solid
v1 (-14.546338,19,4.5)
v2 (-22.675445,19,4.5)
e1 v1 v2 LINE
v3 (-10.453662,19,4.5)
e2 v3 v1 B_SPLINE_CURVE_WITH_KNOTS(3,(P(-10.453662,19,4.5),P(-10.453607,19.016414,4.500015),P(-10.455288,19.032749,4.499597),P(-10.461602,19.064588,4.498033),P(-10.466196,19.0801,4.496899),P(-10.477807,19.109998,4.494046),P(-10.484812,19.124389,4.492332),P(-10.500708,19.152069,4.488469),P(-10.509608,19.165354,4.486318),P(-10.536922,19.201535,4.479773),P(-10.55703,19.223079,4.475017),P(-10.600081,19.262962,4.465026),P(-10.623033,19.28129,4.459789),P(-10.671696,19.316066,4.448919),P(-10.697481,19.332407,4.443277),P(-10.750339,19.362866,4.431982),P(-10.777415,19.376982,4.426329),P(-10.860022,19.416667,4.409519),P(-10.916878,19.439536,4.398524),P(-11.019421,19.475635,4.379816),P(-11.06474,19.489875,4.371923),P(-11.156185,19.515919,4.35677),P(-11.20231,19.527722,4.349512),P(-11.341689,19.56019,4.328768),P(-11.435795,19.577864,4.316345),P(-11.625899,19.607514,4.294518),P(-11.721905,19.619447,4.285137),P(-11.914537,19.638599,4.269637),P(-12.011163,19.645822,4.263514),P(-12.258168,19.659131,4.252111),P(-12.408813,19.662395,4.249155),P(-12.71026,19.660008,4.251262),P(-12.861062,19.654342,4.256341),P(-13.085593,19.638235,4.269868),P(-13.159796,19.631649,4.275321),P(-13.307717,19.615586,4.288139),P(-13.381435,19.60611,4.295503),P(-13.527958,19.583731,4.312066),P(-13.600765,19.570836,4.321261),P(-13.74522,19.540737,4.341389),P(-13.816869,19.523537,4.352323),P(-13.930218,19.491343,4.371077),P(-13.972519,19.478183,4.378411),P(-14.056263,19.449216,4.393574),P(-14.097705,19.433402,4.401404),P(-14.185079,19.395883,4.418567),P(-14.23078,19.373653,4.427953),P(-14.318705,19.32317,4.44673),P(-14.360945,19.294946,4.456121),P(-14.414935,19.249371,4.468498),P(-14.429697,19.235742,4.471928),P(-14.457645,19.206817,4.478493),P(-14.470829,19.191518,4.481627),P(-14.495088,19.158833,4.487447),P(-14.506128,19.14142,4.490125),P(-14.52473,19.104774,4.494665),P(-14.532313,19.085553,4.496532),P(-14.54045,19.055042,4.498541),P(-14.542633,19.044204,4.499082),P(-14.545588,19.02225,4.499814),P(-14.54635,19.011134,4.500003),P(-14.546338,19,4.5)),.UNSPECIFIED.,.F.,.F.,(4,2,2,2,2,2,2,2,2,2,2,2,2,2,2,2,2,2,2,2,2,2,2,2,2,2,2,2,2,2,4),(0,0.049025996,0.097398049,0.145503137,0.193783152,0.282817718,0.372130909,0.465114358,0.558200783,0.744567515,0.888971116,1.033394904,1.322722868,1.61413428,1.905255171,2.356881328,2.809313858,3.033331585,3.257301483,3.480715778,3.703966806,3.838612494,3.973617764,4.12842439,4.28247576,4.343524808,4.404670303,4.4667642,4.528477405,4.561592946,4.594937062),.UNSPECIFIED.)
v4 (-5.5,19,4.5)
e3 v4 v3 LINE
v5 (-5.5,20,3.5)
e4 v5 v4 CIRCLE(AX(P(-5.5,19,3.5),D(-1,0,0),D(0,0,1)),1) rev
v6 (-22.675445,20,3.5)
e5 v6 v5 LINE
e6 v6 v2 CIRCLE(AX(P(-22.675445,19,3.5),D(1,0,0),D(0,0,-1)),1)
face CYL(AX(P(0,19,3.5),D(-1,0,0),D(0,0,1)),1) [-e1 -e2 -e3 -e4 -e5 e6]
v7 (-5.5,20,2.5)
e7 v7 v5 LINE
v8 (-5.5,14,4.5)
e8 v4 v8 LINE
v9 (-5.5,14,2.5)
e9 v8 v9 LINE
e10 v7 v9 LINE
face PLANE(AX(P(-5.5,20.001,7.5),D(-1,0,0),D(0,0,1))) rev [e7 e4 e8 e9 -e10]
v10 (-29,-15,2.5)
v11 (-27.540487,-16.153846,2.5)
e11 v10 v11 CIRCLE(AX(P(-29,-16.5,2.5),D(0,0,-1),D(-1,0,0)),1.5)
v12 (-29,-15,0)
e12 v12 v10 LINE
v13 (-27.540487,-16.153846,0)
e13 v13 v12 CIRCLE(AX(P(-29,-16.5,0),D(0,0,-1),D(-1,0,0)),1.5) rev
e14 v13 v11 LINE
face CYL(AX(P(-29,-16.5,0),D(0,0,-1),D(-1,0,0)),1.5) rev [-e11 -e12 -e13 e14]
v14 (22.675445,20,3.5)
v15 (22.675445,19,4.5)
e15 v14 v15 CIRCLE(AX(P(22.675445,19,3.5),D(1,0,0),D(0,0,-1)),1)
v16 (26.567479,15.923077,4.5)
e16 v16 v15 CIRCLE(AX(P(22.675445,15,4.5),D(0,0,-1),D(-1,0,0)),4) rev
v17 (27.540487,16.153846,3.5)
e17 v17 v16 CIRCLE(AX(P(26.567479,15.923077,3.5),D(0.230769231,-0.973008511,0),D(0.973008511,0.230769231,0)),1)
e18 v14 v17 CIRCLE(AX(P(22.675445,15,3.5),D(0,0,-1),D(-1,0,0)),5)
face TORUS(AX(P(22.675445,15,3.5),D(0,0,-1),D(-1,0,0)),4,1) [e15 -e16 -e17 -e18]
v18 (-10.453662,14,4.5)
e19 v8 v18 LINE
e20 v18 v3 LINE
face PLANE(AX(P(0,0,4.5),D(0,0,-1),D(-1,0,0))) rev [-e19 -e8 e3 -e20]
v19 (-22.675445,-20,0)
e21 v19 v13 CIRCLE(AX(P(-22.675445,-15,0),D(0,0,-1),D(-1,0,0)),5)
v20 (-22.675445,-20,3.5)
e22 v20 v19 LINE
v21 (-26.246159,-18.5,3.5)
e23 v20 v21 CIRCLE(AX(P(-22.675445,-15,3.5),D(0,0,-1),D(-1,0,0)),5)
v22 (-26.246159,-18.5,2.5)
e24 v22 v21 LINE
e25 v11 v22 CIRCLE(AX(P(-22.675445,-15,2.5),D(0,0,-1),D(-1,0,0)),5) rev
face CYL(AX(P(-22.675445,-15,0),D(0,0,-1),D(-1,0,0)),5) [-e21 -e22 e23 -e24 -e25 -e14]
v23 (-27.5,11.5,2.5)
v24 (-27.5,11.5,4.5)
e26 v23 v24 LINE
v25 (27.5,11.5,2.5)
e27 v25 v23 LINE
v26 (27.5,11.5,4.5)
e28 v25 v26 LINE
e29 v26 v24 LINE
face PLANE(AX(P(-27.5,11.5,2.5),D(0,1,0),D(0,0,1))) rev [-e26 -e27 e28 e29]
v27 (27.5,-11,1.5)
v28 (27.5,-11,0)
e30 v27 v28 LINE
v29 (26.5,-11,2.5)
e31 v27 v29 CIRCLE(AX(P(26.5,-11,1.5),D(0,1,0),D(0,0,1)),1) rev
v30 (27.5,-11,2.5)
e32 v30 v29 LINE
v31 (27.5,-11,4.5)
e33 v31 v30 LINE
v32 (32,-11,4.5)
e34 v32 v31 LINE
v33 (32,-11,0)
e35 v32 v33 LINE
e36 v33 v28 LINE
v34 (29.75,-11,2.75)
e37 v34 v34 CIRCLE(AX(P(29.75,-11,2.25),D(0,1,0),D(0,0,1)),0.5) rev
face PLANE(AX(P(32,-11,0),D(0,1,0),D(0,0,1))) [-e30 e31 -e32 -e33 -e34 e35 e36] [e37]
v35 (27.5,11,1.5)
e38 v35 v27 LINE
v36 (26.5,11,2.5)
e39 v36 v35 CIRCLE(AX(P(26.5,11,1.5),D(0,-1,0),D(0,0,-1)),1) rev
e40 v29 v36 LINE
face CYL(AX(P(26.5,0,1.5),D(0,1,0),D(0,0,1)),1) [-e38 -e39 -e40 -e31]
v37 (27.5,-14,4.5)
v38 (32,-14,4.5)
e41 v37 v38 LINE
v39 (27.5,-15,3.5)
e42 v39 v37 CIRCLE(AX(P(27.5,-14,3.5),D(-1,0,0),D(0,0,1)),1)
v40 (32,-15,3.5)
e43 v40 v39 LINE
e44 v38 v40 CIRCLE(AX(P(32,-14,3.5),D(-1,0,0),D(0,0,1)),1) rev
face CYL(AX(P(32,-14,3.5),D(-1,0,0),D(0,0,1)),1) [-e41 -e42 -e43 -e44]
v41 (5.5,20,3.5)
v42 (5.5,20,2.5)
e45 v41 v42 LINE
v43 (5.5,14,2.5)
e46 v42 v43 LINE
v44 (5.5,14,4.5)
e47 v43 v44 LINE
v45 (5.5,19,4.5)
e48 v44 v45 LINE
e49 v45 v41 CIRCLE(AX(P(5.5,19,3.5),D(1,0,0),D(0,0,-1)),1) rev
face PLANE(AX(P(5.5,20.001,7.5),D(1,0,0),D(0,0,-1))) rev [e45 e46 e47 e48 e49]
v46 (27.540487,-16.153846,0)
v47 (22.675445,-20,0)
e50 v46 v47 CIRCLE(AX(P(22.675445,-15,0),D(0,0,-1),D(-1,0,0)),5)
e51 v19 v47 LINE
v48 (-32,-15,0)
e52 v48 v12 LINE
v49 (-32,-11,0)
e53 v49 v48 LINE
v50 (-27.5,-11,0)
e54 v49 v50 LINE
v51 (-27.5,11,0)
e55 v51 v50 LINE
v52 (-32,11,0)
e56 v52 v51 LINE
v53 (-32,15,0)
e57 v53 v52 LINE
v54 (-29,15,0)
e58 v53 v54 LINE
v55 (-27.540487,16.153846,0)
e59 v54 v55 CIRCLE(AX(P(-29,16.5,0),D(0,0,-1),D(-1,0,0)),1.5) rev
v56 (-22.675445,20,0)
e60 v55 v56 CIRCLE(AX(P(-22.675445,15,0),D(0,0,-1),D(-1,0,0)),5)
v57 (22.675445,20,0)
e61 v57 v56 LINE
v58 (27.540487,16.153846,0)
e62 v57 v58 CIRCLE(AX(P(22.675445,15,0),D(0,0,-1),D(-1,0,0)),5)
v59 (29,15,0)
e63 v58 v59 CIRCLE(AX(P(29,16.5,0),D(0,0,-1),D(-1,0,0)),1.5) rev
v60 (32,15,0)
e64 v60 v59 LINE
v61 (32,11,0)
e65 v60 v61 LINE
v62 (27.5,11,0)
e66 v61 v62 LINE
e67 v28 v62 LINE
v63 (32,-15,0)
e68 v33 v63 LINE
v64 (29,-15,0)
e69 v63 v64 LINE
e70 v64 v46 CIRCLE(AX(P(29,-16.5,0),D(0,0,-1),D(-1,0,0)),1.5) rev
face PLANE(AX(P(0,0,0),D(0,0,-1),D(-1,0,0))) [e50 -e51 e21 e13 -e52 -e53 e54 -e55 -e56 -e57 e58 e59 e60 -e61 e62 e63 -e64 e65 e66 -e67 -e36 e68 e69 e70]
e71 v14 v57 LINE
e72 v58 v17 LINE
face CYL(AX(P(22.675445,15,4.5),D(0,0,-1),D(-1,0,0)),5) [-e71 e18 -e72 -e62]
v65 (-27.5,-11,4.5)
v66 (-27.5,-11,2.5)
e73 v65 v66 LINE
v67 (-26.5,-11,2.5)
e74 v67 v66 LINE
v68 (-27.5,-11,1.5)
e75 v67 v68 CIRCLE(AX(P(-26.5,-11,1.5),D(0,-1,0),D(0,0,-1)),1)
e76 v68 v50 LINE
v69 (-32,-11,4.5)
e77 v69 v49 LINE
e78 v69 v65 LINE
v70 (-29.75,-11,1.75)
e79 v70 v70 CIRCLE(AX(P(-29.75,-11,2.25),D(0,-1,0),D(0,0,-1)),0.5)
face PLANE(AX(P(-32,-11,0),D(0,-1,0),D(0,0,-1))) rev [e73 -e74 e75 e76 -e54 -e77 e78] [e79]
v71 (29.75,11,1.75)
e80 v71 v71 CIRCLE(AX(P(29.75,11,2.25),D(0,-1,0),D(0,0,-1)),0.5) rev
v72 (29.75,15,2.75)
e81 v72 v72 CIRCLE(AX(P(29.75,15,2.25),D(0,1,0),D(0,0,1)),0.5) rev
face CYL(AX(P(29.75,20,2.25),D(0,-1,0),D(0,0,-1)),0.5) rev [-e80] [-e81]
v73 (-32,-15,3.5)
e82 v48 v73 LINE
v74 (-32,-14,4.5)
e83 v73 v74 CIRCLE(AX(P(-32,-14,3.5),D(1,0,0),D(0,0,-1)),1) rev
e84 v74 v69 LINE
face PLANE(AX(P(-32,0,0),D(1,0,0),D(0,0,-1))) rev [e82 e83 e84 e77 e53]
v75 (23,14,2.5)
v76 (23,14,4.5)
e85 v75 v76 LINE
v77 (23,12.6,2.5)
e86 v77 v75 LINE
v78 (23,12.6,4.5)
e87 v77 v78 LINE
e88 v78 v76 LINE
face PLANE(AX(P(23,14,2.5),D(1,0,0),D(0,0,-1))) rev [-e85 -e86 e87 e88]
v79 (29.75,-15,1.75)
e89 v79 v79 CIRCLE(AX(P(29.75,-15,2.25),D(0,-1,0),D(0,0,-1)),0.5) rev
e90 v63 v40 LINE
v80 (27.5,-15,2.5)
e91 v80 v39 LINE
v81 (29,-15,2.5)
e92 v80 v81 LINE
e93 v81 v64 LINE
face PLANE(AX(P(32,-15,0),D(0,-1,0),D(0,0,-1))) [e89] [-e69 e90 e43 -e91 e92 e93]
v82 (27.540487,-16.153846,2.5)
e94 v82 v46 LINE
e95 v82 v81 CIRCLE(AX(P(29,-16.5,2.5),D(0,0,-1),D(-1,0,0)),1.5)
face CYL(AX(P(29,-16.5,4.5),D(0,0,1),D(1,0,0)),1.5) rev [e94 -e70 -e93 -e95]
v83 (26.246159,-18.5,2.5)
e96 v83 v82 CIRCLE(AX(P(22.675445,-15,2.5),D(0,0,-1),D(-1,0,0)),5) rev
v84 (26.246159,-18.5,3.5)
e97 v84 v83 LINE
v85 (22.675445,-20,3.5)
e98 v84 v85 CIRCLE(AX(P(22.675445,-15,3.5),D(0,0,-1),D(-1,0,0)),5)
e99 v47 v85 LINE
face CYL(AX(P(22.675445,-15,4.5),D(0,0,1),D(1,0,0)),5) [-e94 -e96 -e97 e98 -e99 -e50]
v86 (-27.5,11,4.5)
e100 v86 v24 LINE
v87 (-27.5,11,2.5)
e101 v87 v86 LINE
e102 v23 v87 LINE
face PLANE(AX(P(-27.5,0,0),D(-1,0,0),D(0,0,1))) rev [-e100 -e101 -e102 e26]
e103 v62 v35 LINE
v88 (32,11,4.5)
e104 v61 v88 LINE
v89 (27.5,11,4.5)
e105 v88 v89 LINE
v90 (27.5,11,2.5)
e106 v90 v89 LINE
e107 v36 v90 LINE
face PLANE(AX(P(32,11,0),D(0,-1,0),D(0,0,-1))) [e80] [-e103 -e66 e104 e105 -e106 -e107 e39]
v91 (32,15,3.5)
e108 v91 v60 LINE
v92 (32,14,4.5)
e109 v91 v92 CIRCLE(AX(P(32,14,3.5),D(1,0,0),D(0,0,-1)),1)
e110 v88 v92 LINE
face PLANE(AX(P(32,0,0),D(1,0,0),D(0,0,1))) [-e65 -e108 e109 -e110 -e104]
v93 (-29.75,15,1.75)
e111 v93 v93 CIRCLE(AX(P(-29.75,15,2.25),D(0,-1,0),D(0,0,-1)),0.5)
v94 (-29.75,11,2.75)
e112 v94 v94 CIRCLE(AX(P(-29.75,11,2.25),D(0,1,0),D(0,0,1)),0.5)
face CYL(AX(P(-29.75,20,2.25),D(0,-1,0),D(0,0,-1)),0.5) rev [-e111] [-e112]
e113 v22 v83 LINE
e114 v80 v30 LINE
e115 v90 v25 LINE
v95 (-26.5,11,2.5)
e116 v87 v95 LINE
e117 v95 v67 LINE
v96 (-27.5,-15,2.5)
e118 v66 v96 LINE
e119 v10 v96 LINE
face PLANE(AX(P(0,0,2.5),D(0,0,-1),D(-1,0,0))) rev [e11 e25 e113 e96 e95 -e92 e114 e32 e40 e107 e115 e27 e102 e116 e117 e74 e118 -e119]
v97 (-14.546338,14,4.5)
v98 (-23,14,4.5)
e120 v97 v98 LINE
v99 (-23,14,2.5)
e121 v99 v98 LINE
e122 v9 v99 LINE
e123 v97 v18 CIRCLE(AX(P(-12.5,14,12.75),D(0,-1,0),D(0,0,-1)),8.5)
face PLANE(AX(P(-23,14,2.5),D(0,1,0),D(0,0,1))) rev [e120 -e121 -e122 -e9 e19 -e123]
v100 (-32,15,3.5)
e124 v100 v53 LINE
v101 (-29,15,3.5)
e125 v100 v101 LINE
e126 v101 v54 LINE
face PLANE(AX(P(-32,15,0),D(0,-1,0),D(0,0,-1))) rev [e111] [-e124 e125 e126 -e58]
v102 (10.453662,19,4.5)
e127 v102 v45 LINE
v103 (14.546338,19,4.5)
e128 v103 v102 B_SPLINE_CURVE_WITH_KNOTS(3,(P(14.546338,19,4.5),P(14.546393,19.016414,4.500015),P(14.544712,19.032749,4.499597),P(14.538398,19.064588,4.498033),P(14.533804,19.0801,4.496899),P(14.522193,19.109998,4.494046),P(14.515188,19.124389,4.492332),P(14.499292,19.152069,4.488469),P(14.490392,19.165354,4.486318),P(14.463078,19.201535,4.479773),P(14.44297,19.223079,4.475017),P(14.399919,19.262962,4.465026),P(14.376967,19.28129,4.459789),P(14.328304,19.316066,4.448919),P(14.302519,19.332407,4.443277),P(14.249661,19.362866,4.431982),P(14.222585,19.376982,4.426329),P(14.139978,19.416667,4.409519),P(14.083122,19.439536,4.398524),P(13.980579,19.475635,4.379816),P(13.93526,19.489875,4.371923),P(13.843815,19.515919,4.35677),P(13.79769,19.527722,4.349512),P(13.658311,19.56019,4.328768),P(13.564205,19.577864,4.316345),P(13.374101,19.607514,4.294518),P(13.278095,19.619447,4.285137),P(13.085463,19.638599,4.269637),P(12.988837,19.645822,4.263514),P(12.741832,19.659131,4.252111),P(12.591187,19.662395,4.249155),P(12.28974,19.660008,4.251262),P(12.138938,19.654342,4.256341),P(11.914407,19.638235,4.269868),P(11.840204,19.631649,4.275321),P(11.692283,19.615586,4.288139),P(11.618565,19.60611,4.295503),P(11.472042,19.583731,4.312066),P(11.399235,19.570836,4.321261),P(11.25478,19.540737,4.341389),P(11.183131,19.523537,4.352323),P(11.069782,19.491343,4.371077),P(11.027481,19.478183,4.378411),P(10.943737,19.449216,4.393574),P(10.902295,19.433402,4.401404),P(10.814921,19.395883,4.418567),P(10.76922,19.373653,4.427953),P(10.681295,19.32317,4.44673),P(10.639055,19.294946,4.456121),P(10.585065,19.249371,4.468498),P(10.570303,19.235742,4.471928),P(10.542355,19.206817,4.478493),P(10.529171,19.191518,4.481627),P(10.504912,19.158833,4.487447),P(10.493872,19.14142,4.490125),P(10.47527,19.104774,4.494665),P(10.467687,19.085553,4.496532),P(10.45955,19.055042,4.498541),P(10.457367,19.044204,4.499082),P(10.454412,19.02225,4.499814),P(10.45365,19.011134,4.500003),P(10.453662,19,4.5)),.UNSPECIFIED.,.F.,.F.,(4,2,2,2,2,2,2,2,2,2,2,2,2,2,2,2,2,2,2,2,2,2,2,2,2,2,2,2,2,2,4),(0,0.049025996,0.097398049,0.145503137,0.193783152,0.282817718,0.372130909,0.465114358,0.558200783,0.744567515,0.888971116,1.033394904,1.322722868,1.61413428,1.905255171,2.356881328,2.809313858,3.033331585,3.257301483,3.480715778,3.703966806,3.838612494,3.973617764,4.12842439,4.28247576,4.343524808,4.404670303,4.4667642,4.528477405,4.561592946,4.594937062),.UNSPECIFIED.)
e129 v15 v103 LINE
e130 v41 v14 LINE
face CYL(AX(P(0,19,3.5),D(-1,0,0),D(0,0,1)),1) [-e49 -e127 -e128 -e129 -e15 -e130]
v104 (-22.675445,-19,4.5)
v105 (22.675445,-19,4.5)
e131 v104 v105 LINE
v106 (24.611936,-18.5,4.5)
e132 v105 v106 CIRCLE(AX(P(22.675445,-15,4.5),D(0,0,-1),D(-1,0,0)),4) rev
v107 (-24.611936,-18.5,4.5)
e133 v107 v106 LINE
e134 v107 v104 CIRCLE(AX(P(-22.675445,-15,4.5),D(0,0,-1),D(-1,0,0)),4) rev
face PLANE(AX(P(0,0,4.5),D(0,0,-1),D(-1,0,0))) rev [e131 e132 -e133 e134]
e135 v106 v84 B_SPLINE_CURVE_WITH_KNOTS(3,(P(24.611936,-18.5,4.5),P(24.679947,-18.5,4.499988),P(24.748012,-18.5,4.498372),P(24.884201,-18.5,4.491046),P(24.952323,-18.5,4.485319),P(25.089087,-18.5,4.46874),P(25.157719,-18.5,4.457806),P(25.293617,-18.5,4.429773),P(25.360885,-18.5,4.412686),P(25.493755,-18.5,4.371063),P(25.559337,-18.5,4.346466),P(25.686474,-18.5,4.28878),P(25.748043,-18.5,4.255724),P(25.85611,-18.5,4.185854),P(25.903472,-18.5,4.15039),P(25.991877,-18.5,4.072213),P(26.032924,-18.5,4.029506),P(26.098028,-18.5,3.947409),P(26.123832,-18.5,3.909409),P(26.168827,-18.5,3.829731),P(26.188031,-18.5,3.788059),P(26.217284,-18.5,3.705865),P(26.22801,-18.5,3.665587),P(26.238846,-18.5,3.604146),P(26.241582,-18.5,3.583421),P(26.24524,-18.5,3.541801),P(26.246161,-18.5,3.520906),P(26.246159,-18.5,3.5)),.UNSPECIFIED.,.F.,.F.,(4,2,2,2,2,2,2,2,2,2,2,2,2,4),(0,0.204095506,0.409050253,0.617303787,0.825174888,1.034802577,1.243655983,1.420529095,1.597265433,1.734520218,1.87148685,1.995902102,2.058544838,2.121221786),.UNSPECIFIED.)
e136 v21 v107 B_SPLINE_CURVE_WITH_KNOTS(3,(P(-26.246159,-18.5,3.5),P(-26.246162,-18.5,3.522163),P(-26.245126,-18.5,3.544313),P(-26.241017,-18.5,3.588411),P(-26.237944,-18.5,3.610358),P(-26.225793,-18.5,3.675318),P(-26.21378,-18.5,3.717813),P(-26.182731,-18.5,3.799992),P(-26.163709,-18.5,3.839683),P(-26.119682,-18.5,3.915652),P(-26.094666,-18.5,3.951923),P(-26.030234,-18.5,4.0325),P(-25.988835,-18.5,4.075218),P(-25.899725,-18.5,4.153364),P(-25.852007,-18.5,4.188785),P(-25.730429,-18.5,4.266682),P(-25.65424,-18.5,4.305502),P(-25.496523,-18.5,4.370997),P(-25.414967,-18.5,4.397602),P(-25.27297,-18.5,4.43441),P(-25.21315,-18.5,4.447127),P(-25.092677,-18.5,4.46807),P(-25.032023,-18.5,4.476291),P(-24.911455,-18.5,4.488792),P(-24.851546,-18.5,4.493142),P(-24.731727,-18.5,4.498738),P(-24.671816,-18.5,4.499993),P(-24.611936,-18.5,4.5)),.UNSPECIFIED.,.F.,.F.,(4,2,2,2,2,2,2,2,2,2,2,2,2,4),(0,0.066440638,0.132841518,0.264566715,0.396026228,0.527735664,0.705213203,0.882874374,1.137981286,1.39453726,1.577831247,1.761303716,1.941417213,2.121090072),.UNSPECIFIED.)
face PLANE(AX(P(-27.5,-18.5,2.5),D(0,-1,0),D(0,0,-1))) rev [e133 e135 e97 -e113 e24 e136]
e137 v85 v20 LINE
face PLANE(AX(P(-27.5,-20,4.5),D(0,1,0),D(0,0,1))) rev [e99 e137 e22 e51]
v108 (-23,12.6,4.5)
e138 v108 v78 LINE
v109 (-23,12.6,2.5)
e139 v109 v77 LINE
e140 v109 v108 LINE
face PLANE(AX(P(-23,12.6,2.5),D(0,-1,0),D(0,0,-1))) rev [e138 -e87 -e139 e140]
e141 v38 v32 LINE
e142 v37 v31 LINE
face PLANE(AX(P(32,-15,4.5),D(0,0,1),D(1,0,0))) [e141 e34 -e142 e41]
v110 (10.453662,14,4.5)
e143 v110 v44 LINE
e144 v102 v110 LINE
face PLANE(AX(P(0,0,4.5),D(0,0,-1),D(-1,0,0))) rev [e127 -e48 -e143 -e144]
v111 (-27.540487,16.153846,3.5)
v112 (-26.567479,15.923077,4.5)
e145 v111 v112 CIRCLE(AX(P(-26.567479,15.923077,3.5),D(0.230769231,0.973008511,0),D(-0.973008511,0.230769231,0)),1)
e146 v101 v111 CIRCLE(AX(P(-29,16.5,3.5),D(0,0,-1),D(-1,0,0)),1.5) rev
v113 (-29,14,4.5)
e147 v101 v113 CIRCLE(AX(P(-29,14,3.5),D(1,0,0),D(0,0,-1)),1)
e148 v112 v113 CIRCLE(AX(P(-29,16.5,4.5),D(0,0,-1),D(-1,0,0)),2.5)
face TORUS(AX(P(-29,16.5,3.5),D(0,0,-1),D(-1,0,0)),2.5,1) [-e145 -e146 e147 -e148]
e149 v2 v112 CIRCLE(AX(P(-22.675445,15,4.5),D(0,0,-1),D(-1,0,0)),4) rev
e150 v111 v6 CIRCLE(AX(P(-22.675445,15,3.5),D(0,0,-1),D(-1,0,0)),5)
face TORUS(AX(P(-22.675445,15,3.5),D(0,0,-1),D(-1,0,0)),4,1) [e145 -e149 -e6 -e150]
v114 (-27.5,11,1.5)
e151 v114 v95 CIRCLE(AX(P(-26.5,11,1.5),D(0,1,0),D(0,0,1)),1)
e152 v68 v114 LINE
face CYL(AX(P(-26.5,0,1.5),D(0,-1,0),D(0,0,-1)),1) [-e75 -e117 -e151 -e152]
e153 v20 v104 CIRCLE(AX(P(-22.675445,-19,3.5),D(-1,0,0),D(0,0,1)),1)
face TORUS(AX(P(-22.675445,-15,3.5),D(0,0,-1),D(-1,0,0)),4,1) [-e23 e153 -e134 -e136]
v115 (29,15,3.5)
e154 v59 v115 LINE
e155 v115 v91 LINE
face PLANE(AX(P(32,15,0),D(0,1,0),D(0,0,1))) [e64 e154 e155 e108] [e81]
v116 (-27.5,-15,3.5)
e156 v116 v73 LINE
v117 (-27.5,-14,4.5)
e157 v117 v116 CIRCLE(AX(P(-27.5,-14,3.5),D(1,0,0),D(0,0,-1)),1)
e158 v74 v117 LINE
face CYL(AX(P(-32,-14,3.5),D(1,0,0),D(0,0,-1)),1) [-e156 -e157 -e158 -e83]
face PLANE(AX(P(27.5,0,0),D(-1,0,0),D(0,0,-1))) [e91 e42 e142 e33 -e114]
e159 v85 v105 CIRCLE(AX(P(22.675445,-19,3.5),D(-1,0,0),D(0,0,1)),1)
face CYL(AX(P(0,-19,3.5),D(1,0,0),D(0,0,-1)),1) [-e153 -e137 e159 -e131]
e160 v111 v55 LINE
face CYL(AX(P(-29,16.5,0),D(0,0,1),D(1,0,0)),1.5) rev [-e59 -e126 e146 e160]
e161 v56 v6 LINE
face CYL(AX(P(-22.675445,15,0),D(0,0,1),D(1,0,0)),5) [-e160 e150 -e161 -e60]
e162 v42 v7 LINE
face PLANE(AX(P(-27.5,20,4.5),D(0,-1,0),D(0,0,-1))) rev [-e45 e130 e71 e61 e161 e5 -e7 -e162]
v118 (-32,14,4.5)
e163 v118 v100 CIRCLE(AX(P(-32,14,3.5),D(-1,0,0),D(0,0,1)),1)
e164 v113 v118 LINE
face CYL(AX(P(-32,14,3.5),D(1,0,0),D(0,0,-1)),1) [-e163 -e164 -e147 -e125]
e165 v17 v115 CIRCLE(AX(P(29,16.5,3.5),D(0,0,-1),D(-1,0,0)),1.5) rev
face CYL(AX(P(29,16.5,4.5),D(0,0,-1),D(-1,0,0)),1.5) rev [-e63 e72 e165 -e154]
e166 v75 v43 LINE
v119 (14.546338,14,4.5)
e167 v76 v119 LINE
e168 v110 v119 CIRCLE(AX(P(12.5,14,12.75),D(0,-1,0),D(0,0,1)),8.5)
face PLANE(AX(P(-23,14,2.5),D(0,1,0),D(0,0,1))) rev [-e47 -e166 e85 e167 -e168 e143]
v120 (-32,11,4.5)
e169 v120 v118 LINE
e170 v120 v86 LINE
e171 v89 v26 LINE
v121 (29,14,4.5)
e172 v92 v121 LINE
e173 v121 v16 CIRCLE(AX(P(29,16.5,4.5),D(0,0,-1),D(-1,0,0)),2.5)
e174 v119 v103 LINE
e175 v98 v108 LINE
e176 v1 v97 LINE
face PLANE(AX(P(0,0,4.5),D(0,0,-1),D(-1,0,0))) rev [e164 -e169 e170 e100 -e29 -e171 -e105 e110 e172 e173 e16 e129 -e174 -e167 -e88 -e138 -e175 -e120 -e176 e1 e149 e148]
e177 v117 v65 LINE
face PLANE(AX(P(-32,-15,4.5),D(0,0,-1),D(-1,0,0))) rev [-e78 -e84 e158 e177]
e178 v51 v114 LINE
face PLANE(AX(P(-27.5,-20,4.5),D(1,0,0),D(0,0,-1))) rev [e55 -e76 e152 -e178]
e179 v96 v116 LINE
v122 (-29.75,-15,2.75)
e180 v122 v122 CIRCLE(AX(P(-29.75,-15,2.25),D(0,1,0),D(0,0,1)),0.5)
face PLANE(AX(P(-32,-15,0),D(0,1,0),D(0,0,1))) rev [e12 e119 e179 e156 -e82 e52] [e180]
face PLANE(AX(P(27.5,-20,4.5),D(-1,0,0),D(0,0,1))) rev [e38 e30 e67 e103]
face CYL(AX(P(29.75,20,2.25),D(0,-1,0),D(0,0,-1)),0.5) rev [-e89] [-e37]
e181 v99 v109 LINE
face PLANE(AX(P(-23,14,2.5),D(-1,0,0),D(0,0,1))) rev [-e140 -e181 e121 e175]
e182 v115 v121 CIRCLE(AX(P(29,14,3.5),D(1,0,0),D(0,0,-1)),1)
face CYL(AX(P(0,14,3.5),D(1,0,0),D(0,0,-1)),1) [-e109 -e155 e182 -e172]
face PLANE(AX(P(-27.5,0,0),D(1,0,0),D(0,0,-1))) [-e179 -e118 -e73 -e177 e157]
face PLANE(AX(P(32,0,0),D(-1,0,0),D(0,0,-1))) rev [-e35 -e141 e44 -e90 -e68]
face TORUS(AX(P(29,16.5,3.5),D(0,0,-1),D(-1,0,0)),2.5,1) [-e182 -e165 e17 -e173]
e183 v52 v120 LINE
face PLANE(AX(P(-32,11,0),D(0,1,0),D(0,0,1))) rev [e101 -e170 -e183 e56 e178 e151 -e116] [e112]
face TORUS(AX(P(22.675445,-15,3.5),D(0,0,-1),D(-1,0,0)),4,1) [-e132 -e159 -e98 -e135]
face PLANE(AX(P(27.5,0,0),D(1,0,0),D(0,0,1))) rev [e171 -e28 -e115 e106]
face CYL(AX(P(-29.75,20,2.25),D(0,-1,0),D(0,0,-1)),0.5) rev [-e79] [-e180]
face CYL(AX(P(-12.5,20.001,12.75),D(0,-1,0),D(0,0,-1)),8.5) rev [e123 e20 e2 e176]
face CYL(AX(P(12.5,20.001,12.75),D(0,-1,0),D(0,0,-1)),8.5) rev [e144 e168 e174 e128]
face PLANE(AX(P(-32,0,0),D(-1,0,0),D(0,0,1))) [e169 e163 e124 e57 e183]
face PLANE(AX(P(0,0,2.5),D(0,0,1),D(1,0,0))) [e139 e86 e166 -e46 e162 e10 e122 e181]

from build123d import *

# Parameters (mm, degrees)
SKETCH1_W           = 55
SKETCH1_H           = 40
BOSS_EXTRUDE1_DEPTH = 4.5
SKETCH2_W           = 46
SKETCH2_H           = 1.4
SKETCH2_W_2         = 55
SKETCH2_H_2         = 30
CUT_EXTRUDE1_DEPTH  = 2
CUT_EXTRUDE2_REACH  = 45.96
SKETCH3_R           = 8.5
SKETCH3_W           = 11
SKETCH3_H           = 5
SKETCH4_W           = 4.5
SKETCH4_H           = 4
BOSS_EXTRUDE2_DEPTH = 4.5
SKETCH5_R           = 0.5
CUT_EXTRUDE3_DEPTH  = 45.780017865
FILLET1_R           = 1.5
FILLET2_R           = 5
FILLET3_R           = 1
FILLET4_R           = 1


with BuildPart() as part:
    # Sketch1 → Boss-Extrude1 (new body)
    with BuildSketch(Plane.XY):
        Rectangle(SKETCH1_W, SKETCH1_H)
    extrude(amount=BOSS_EXTRUDE1_DEPTH)

    # Sketch2 → Cut-Extrude1 (cut)
    with BuildSketch(Plane.XY.offset(4.5)):
        with Locations((0, 13.3)):
            Rectangle(SKETCH2_W, SKETCH2_H)
        with Locations((0, -3.5)):
            Rectangle(SKETCH2_W_2, SKETCH2_H_2)
    extrude(amount=-CUT_EXTRUDE1_DEPTH, mode=Mode.SUBTRACT)

    # Sketch3 → Cut-Extrude2 (cut, up to next)
    with BuildSketch(Plane.XZ.offset(-14), mode=Mode.PRIVATE) as cut_extrude2_sk1:
        with Locations((-12.5, 12.75)):
            Circle(SKETCH3_R)
    cut_extrude2_tool1 = extrude(cut_extrude2_sk1.sketch, amount=-CUT_EXTRUDE2_REACH, mode=Mode.PRIVATE) & part.part
    # Sketch3 → Cut-Extrude2 (cut, up to next)
    with BuildSketch(Plane.XZ.offset(-14), mode=Mode.PRIVATE) as cut_extrude2_sk2:
        with Locations((12.5, 12.75)):
            Circle(SKETCH3_R)
    cut_extrude2_tool2 = extrude(cut_extrude2_sk2.sketch, amount=-CUT_EXTRUDE2_REACH, mode=Mode.PRIVATE) & part.part
    # Sketch3 → Cut-Extrude2 (cut, up to next)
    with BuildSketch(Plane.XZ.offset(-14), mode=Mode.PRIVATE) as cut_extrude2_sk3:
        with Locations((0, 5)):
            Rectangle(SKETCH3_W, SKETCH3_H)
    cut_extrude2_tool3 = extrude(cut_extrude2_sk3.sketch, amount=-CUT_EXTRUDE2_REACH, mode=Mode.PRIVATE) & part.part
    add(cut_extrude2_tool1.solids().sort_by_distance((-12.5, 14, 12.75))[0], mode=Mode.SUBTRACT)
    add(cut_extrude2_tool2.solids().sort_by_distance((12.5, 14, 12.75))[0], mode=Mode.SUBTRACT)
    add(cut_extrude2_tool3.solids().sort_by_distance((0, 14, 5))[0], mode=Mode.SUBTRACT)

    # Sketch4 → Boss-Extrude2 (add)
    with BuildSketch(Plane.ZY.offset(27.5)):
        with Locations((2.25, 13)):
            Rectangle(SKETCH4_W, SKETCH4_H)
        with Locations((2.25, -13)):
            Rectangle(SKETCH4_W, SKETCH4_H)
    boss_extrude2 = extrude(amount=BOSS_EXTRUDE2_DEPTH)

    # Sketch5 → Cut-Extrude3 (cut, symmetric)
    with BuildSketch(Plane.XZ.offset(-11)):
        with Locations(Location((-29.75, 2.25, 0), (0, 0, 270))):
            Circle(SKETCH5_R)
    cut_extrude3 = extrude(amount=CUT_EXTRUDE3_DEPTH, both=True, mode=Mode.SUBTRACT)

    # Mirror1: Boss-Extrude2, Cut-Extrude3 across plane
    add(boss_extrude2.mirror(Plane(origin=(0, 0, 0), x_dir=(0, 0, 1), z_dir=(1, 0, 0))))
    add(cut_extrude3.mirror(Plane(origin=(0, 0, 0), x_dir=(0, 0, 1), z_dir=(1, 0, 0))), mode=Mode.SUBTRACT)

    # Fillet1
    fillet1_edges = [part.edges().sort_by_distance(p)[0] for p in [
        (27.5, 15, 2.25),
        (27.5, -15, 1.25),
        (-27.5, 15, 2.25),
        (-27.5, -15, 1.25),
    ]]
    fillet(fillet1_edges, radius=FILLET1_R)

    # Fillet2
    # the kernel refuses this fillet: 5 mm, written as the material it takes off along each edge
    with BuildSketch(Plane(origin=(-27.5, 20, -12.061388301), x_dir=(1, 0, 0), z_dir=(0, 0, 1)), Plane(origin=(27.5, -20, -12.061388301), x_dir=(-1, 0, 0), z_dir=(0, 0, 1))) as fillet2_piece_1:
        with BuildLine():
            CenterArc((4.82455532, -5), FILLET2_R, 90, 76.657636203)
            Line((-0.040487234, -3.846153846), (-0.526991489, -3.730769231))
            ThreePointArc((-0.526991489, -3.730769231), (-0.5, -3.5), (-0.5, 0))
            Line((-0.5, 0), (0, 0.5))
            Line((0, 0.5), (4.82455532, 0.5))
            Line((4.82455532, 0.5), (4.82455532, 0))
        make_face()
    extrude(amount=28.622776602, mode=Mode.SUBTRACT)
    with BuildSketch(Plane(origin=(27.5, 20, -12.061388301), x_dir=(0.010526097592205859, -0.9999445991001099, 0), z_dir=(0, 0, 1)), Plane(origin=(-27.5, -20, -12.061388301), x_dir=(-0.010526097592205859, 0.9999445991001099, 0), z_dir=(0, 0, 1))) as fillet2_piece_2:
        with BuildLine():
            CenterArc((4.948939255, -4.876918524), FILLET2_R, 102.739251693, 76.657636203)
            Line((-0.05078374, -4.824288036), (-0.55075604, -4.819024987))
            Line((-0.55075604, -4.819024987), (-0.4999723, 0.005263049))
            Line((-0.4999723, 0.005263049), (0.005263049, 0.4999723))
            ThreePointArc((0.005263049, 0.4999723), (3.505069146, 0.463130958), (3.736109707, 0.487691852))
            Line((3.736109707, 0.487691852), (3.846366938, 0))
        make_face()
    extrude(amount=28.622776602, mode=Mode.SUBTRACT)

    # Fillet3
    fillet3_edges = [part.edges().sort_by_distance(p)[0] for p in [
        (27.5, 0, 2.5),
        (-27.5, 0, 2.5),
    ]]
    fillet(fillet3_edges, radius=FILLET3_R)

    # Fillet4
    # the kernel refuses this fillet: 1 mm, written as the material it takes off along each edge
    with BuildSketch(Plane(origin=(29, 15, 4.5), x_dir=(0, 0, -1), z_dir=(1, 0, 0))) as fillet4_piece_1:
        with BuildLine():
            CenterArc((FILLET4_R, -FILLET4_R), FILLET4_R, 90, 90)
            Line((0, -FILLET4_R), (0, 0))
            Line((0, 0), (FILLET4_R, 0))
        make_face()
    extrude(amount=5.5, mode=Mode.SUBTRACT)
    with BuildSketch(Plane(origin=(25, -15, 4.5), x_dir=(0, 0, -1), z_dir=(1, 0, 0)), Plane(origin=(-25, -15, 4.5), x_dir=(0, 1, 0), z_dir=(-1, 0, 0))) as fillet4_piece_2:
        with BuildLine():
            CenterArc((FILLET4_R, FILLET4_R), FILLET4_R, 180, 90)
            Line((0, FILLET4_R), (0, 0))
            Line((0, 0), (FILLET4_R, 0))
        make_face()
    extrude(amount=9.5, mode=Mode.SUBTRACT)
    with BuildSketch(Plane(origin=(29, 16.5, 4.5), x_dir=(0, -1, 0), z_dir=(1, 0, 0))) as fillet4_piece_3:
        with BuildLine():
            CenterArc((1.5 + FILLET4_R, FILLET4_R), FILLET4_R, 180, 90)
            Line((1.5 + FILLET4_R, 0), (1.5, 0))
            Line((1.5, 0), (1.5, FILLET4_R))
        make_face()
    revolve(axis=Axis((29, 16.5, 4.5), (0, 0, -1)), revolution_arc=76.657636203, mode=Mode.SUBTRACT)
    with BuildSketch(Plane(origin=(-29, 16.5, 4.5), x_dir=(0.9730085108210323, -0.23076923076926206, 0), z_dir=(0.23076923076926206, 0.9730085108210323, 0))) as fillet4_piece_4:
        with BuildLine():
            CenterArc((1.5 + FILLET4_R, FILLET4_R), FILLET4_R, 180, 90)
            Line((1.5 + FILLET4_R, 0), (1.5, 0))
            Line((1.5, 0), (1.5, FILLET4_R))
        make_face()
    revolve(axis=Axis((-29, 16.5, 4.5), (0, 0, -1)), revolution_arc=76.657636203, mode=Mode.SUBTRACT)
    with BuildSketch(Plane(origin=(22.67544468, 20, 4.5), x_dir=(0, 0, -1), z_dir=(-1, 0, 0)), Plane(origin=(-12.046338193, 20, 4.5), x_dir=(0, 0, -1), z_dir=(-1, 0, 0))) as fillet4_piece_5:
        with BuildLine():
            CenterArc((FILLET4_R, FILLET4_R), FILLET4_R, 180, 90)
            Line((0, FILLET4_R), (0, 0))
            Line((0, 0), (FILLET4_R, 0))
        make_face()
    extrude(amount=10.629106487, mode=Mode.SUBTRACT)
    with BuildSketch(Plane(origin=(22.67544468, 15, 4.5), x_dir=(0, 1, 0), z_dir=(-1, 0, 0))) as fillet4_piece_6:
        with BuildLine():
            CenterArc((5 - FILLET4_R, FILLET4_R), FILLET4_R, 270, 90)
            Line((5 - FILLET4_R, 0), (5, 0))
            Line((5, 0), (5, FILLET4_R))
        make_face()
    revolve(axis=Axis((22.67544468, 15, 4.5), (0, 0, -1)), revolution_arc=76.657636203, mode=Mode.SUBTRACT)
    with BuildSketch(Plane(origin=(-22.67544468, 15, 4.5), x_dir=(-0.9730085108210407, 0.2307692307692272, 0), z_dir=(-0.2307692307692272, -0.9730085108210407, 0))) as fillet4_piece_7:
        with BuildLine():
            CenterArc((5 - FILLET4_R, FILLET4_R), FILLET4_R, 270, 90)
            Line((5 - FILLET4_R, 0), (5, 0))
            Line((5, 0), (5, FILLET4_R))
        make_face()
    revolve(axis=Axis((-22.67544468, 15, 4.5), (0, 0, -1)), revolution_arc=76.657636203, mode=Mode.SUBTRACT)
    with BuildSketch(Plane(origin=(-22.67544468, -20, 4.5), x_dir=(0, 0, -1), z_dir=(1, 0, 0))) as fillet4_piece_8:
        with BuildLine():
            CenterArc((FILLET4_R, FILLET4_R), FILLET4_R, 180, 90)
            Line((0, FILLET4_R), (0, 0))
            Line((0, 0), (FILLET4_R, 0))
        make_face()
    extrude(amount=45.350889359, mode=Mode.SUBTRACT)
    with BuildSketch(Plane(origin=(-22.67544468, -15, 4.5), x_dir=(0, -1, 0), z_dir=(1, 0, 0))) as fillet4_piece_9:
        with BuildLine():
            CenterArc((5 - FILLET4_R, FILLET4_R), FILLET4_R, 270, 90)
            Line((5 - FILLET4_R, 0), (5, 0))
            Line((5, 0), (5, FILLET4_R))
        make_face()
    revolve(axis=Axis((-22.67544468, -15, 4.5), (0, 0, -1)), revolution_arc=74.223835896, mode=Mode.SUBTRACT)
    with BuildSketch(Plane(origin=(22.67544468, -15, 4.5), x_dir=(0.9623311828904709, -0.2718799265054833, 0), z_dir=(0.2718799265054833, 0.9623311828904709, 0))) as fillet4_piece_10:
        with BuildLine():
            CenterArc((5 - FILLET4_R, FILLET4_R), FILLET4_R, 270, 90)
            Line((5 - FILLET4_R, 0), (5, 0))
            Line((5, 0), (5, FILLET4_R))
        make_face()
    revolve(axis=Axis((22.67544468, -15, 4.5), (0, 0, -1)), revolution_arc=74.223835896, mode=Mode.SUBTRACT)
    with BuildSketch(Plane(origin=(12.953661807, 20, 4.5), x_dir=(0, 0, -1), z_dir=(-1, 0, 0)), Plane(origin=(-3, 20, 4.5), x_dir=(0, 0, -1), z_dir=(-1, 0, 0))) as fillet4_piece_11:
        with BuildLine():
            CenterArc((FILLET4_R, FILLET4_R), FILLET4_R, 180, 90)
            Line((0, FILLET4_R), (0, 0))
            Line((0, 0), (FILLET4_R, 0))
        make_face()
    extrude(amount=9.953661807, mode=Mode.SUBTRACT)
    with BuildSketch(Plane(origin=(-29, 15, 4.5), x_dir=(0, 0, -1), z_dir=(-1, 0, 0))) as fillet4_piece_12:
        with BuildLine():
            CenterArc((FILLET4_R, FILLET4_R), FILLET4_R, 180, 90)
            Line((0, FILLET4_R), (0, 0))
            Line((0, 0), (FILLET4_R, 0))
        make_face()
    extrude(amount=5.5, mode=Mode.SUBTRACT)


solid = part.part
